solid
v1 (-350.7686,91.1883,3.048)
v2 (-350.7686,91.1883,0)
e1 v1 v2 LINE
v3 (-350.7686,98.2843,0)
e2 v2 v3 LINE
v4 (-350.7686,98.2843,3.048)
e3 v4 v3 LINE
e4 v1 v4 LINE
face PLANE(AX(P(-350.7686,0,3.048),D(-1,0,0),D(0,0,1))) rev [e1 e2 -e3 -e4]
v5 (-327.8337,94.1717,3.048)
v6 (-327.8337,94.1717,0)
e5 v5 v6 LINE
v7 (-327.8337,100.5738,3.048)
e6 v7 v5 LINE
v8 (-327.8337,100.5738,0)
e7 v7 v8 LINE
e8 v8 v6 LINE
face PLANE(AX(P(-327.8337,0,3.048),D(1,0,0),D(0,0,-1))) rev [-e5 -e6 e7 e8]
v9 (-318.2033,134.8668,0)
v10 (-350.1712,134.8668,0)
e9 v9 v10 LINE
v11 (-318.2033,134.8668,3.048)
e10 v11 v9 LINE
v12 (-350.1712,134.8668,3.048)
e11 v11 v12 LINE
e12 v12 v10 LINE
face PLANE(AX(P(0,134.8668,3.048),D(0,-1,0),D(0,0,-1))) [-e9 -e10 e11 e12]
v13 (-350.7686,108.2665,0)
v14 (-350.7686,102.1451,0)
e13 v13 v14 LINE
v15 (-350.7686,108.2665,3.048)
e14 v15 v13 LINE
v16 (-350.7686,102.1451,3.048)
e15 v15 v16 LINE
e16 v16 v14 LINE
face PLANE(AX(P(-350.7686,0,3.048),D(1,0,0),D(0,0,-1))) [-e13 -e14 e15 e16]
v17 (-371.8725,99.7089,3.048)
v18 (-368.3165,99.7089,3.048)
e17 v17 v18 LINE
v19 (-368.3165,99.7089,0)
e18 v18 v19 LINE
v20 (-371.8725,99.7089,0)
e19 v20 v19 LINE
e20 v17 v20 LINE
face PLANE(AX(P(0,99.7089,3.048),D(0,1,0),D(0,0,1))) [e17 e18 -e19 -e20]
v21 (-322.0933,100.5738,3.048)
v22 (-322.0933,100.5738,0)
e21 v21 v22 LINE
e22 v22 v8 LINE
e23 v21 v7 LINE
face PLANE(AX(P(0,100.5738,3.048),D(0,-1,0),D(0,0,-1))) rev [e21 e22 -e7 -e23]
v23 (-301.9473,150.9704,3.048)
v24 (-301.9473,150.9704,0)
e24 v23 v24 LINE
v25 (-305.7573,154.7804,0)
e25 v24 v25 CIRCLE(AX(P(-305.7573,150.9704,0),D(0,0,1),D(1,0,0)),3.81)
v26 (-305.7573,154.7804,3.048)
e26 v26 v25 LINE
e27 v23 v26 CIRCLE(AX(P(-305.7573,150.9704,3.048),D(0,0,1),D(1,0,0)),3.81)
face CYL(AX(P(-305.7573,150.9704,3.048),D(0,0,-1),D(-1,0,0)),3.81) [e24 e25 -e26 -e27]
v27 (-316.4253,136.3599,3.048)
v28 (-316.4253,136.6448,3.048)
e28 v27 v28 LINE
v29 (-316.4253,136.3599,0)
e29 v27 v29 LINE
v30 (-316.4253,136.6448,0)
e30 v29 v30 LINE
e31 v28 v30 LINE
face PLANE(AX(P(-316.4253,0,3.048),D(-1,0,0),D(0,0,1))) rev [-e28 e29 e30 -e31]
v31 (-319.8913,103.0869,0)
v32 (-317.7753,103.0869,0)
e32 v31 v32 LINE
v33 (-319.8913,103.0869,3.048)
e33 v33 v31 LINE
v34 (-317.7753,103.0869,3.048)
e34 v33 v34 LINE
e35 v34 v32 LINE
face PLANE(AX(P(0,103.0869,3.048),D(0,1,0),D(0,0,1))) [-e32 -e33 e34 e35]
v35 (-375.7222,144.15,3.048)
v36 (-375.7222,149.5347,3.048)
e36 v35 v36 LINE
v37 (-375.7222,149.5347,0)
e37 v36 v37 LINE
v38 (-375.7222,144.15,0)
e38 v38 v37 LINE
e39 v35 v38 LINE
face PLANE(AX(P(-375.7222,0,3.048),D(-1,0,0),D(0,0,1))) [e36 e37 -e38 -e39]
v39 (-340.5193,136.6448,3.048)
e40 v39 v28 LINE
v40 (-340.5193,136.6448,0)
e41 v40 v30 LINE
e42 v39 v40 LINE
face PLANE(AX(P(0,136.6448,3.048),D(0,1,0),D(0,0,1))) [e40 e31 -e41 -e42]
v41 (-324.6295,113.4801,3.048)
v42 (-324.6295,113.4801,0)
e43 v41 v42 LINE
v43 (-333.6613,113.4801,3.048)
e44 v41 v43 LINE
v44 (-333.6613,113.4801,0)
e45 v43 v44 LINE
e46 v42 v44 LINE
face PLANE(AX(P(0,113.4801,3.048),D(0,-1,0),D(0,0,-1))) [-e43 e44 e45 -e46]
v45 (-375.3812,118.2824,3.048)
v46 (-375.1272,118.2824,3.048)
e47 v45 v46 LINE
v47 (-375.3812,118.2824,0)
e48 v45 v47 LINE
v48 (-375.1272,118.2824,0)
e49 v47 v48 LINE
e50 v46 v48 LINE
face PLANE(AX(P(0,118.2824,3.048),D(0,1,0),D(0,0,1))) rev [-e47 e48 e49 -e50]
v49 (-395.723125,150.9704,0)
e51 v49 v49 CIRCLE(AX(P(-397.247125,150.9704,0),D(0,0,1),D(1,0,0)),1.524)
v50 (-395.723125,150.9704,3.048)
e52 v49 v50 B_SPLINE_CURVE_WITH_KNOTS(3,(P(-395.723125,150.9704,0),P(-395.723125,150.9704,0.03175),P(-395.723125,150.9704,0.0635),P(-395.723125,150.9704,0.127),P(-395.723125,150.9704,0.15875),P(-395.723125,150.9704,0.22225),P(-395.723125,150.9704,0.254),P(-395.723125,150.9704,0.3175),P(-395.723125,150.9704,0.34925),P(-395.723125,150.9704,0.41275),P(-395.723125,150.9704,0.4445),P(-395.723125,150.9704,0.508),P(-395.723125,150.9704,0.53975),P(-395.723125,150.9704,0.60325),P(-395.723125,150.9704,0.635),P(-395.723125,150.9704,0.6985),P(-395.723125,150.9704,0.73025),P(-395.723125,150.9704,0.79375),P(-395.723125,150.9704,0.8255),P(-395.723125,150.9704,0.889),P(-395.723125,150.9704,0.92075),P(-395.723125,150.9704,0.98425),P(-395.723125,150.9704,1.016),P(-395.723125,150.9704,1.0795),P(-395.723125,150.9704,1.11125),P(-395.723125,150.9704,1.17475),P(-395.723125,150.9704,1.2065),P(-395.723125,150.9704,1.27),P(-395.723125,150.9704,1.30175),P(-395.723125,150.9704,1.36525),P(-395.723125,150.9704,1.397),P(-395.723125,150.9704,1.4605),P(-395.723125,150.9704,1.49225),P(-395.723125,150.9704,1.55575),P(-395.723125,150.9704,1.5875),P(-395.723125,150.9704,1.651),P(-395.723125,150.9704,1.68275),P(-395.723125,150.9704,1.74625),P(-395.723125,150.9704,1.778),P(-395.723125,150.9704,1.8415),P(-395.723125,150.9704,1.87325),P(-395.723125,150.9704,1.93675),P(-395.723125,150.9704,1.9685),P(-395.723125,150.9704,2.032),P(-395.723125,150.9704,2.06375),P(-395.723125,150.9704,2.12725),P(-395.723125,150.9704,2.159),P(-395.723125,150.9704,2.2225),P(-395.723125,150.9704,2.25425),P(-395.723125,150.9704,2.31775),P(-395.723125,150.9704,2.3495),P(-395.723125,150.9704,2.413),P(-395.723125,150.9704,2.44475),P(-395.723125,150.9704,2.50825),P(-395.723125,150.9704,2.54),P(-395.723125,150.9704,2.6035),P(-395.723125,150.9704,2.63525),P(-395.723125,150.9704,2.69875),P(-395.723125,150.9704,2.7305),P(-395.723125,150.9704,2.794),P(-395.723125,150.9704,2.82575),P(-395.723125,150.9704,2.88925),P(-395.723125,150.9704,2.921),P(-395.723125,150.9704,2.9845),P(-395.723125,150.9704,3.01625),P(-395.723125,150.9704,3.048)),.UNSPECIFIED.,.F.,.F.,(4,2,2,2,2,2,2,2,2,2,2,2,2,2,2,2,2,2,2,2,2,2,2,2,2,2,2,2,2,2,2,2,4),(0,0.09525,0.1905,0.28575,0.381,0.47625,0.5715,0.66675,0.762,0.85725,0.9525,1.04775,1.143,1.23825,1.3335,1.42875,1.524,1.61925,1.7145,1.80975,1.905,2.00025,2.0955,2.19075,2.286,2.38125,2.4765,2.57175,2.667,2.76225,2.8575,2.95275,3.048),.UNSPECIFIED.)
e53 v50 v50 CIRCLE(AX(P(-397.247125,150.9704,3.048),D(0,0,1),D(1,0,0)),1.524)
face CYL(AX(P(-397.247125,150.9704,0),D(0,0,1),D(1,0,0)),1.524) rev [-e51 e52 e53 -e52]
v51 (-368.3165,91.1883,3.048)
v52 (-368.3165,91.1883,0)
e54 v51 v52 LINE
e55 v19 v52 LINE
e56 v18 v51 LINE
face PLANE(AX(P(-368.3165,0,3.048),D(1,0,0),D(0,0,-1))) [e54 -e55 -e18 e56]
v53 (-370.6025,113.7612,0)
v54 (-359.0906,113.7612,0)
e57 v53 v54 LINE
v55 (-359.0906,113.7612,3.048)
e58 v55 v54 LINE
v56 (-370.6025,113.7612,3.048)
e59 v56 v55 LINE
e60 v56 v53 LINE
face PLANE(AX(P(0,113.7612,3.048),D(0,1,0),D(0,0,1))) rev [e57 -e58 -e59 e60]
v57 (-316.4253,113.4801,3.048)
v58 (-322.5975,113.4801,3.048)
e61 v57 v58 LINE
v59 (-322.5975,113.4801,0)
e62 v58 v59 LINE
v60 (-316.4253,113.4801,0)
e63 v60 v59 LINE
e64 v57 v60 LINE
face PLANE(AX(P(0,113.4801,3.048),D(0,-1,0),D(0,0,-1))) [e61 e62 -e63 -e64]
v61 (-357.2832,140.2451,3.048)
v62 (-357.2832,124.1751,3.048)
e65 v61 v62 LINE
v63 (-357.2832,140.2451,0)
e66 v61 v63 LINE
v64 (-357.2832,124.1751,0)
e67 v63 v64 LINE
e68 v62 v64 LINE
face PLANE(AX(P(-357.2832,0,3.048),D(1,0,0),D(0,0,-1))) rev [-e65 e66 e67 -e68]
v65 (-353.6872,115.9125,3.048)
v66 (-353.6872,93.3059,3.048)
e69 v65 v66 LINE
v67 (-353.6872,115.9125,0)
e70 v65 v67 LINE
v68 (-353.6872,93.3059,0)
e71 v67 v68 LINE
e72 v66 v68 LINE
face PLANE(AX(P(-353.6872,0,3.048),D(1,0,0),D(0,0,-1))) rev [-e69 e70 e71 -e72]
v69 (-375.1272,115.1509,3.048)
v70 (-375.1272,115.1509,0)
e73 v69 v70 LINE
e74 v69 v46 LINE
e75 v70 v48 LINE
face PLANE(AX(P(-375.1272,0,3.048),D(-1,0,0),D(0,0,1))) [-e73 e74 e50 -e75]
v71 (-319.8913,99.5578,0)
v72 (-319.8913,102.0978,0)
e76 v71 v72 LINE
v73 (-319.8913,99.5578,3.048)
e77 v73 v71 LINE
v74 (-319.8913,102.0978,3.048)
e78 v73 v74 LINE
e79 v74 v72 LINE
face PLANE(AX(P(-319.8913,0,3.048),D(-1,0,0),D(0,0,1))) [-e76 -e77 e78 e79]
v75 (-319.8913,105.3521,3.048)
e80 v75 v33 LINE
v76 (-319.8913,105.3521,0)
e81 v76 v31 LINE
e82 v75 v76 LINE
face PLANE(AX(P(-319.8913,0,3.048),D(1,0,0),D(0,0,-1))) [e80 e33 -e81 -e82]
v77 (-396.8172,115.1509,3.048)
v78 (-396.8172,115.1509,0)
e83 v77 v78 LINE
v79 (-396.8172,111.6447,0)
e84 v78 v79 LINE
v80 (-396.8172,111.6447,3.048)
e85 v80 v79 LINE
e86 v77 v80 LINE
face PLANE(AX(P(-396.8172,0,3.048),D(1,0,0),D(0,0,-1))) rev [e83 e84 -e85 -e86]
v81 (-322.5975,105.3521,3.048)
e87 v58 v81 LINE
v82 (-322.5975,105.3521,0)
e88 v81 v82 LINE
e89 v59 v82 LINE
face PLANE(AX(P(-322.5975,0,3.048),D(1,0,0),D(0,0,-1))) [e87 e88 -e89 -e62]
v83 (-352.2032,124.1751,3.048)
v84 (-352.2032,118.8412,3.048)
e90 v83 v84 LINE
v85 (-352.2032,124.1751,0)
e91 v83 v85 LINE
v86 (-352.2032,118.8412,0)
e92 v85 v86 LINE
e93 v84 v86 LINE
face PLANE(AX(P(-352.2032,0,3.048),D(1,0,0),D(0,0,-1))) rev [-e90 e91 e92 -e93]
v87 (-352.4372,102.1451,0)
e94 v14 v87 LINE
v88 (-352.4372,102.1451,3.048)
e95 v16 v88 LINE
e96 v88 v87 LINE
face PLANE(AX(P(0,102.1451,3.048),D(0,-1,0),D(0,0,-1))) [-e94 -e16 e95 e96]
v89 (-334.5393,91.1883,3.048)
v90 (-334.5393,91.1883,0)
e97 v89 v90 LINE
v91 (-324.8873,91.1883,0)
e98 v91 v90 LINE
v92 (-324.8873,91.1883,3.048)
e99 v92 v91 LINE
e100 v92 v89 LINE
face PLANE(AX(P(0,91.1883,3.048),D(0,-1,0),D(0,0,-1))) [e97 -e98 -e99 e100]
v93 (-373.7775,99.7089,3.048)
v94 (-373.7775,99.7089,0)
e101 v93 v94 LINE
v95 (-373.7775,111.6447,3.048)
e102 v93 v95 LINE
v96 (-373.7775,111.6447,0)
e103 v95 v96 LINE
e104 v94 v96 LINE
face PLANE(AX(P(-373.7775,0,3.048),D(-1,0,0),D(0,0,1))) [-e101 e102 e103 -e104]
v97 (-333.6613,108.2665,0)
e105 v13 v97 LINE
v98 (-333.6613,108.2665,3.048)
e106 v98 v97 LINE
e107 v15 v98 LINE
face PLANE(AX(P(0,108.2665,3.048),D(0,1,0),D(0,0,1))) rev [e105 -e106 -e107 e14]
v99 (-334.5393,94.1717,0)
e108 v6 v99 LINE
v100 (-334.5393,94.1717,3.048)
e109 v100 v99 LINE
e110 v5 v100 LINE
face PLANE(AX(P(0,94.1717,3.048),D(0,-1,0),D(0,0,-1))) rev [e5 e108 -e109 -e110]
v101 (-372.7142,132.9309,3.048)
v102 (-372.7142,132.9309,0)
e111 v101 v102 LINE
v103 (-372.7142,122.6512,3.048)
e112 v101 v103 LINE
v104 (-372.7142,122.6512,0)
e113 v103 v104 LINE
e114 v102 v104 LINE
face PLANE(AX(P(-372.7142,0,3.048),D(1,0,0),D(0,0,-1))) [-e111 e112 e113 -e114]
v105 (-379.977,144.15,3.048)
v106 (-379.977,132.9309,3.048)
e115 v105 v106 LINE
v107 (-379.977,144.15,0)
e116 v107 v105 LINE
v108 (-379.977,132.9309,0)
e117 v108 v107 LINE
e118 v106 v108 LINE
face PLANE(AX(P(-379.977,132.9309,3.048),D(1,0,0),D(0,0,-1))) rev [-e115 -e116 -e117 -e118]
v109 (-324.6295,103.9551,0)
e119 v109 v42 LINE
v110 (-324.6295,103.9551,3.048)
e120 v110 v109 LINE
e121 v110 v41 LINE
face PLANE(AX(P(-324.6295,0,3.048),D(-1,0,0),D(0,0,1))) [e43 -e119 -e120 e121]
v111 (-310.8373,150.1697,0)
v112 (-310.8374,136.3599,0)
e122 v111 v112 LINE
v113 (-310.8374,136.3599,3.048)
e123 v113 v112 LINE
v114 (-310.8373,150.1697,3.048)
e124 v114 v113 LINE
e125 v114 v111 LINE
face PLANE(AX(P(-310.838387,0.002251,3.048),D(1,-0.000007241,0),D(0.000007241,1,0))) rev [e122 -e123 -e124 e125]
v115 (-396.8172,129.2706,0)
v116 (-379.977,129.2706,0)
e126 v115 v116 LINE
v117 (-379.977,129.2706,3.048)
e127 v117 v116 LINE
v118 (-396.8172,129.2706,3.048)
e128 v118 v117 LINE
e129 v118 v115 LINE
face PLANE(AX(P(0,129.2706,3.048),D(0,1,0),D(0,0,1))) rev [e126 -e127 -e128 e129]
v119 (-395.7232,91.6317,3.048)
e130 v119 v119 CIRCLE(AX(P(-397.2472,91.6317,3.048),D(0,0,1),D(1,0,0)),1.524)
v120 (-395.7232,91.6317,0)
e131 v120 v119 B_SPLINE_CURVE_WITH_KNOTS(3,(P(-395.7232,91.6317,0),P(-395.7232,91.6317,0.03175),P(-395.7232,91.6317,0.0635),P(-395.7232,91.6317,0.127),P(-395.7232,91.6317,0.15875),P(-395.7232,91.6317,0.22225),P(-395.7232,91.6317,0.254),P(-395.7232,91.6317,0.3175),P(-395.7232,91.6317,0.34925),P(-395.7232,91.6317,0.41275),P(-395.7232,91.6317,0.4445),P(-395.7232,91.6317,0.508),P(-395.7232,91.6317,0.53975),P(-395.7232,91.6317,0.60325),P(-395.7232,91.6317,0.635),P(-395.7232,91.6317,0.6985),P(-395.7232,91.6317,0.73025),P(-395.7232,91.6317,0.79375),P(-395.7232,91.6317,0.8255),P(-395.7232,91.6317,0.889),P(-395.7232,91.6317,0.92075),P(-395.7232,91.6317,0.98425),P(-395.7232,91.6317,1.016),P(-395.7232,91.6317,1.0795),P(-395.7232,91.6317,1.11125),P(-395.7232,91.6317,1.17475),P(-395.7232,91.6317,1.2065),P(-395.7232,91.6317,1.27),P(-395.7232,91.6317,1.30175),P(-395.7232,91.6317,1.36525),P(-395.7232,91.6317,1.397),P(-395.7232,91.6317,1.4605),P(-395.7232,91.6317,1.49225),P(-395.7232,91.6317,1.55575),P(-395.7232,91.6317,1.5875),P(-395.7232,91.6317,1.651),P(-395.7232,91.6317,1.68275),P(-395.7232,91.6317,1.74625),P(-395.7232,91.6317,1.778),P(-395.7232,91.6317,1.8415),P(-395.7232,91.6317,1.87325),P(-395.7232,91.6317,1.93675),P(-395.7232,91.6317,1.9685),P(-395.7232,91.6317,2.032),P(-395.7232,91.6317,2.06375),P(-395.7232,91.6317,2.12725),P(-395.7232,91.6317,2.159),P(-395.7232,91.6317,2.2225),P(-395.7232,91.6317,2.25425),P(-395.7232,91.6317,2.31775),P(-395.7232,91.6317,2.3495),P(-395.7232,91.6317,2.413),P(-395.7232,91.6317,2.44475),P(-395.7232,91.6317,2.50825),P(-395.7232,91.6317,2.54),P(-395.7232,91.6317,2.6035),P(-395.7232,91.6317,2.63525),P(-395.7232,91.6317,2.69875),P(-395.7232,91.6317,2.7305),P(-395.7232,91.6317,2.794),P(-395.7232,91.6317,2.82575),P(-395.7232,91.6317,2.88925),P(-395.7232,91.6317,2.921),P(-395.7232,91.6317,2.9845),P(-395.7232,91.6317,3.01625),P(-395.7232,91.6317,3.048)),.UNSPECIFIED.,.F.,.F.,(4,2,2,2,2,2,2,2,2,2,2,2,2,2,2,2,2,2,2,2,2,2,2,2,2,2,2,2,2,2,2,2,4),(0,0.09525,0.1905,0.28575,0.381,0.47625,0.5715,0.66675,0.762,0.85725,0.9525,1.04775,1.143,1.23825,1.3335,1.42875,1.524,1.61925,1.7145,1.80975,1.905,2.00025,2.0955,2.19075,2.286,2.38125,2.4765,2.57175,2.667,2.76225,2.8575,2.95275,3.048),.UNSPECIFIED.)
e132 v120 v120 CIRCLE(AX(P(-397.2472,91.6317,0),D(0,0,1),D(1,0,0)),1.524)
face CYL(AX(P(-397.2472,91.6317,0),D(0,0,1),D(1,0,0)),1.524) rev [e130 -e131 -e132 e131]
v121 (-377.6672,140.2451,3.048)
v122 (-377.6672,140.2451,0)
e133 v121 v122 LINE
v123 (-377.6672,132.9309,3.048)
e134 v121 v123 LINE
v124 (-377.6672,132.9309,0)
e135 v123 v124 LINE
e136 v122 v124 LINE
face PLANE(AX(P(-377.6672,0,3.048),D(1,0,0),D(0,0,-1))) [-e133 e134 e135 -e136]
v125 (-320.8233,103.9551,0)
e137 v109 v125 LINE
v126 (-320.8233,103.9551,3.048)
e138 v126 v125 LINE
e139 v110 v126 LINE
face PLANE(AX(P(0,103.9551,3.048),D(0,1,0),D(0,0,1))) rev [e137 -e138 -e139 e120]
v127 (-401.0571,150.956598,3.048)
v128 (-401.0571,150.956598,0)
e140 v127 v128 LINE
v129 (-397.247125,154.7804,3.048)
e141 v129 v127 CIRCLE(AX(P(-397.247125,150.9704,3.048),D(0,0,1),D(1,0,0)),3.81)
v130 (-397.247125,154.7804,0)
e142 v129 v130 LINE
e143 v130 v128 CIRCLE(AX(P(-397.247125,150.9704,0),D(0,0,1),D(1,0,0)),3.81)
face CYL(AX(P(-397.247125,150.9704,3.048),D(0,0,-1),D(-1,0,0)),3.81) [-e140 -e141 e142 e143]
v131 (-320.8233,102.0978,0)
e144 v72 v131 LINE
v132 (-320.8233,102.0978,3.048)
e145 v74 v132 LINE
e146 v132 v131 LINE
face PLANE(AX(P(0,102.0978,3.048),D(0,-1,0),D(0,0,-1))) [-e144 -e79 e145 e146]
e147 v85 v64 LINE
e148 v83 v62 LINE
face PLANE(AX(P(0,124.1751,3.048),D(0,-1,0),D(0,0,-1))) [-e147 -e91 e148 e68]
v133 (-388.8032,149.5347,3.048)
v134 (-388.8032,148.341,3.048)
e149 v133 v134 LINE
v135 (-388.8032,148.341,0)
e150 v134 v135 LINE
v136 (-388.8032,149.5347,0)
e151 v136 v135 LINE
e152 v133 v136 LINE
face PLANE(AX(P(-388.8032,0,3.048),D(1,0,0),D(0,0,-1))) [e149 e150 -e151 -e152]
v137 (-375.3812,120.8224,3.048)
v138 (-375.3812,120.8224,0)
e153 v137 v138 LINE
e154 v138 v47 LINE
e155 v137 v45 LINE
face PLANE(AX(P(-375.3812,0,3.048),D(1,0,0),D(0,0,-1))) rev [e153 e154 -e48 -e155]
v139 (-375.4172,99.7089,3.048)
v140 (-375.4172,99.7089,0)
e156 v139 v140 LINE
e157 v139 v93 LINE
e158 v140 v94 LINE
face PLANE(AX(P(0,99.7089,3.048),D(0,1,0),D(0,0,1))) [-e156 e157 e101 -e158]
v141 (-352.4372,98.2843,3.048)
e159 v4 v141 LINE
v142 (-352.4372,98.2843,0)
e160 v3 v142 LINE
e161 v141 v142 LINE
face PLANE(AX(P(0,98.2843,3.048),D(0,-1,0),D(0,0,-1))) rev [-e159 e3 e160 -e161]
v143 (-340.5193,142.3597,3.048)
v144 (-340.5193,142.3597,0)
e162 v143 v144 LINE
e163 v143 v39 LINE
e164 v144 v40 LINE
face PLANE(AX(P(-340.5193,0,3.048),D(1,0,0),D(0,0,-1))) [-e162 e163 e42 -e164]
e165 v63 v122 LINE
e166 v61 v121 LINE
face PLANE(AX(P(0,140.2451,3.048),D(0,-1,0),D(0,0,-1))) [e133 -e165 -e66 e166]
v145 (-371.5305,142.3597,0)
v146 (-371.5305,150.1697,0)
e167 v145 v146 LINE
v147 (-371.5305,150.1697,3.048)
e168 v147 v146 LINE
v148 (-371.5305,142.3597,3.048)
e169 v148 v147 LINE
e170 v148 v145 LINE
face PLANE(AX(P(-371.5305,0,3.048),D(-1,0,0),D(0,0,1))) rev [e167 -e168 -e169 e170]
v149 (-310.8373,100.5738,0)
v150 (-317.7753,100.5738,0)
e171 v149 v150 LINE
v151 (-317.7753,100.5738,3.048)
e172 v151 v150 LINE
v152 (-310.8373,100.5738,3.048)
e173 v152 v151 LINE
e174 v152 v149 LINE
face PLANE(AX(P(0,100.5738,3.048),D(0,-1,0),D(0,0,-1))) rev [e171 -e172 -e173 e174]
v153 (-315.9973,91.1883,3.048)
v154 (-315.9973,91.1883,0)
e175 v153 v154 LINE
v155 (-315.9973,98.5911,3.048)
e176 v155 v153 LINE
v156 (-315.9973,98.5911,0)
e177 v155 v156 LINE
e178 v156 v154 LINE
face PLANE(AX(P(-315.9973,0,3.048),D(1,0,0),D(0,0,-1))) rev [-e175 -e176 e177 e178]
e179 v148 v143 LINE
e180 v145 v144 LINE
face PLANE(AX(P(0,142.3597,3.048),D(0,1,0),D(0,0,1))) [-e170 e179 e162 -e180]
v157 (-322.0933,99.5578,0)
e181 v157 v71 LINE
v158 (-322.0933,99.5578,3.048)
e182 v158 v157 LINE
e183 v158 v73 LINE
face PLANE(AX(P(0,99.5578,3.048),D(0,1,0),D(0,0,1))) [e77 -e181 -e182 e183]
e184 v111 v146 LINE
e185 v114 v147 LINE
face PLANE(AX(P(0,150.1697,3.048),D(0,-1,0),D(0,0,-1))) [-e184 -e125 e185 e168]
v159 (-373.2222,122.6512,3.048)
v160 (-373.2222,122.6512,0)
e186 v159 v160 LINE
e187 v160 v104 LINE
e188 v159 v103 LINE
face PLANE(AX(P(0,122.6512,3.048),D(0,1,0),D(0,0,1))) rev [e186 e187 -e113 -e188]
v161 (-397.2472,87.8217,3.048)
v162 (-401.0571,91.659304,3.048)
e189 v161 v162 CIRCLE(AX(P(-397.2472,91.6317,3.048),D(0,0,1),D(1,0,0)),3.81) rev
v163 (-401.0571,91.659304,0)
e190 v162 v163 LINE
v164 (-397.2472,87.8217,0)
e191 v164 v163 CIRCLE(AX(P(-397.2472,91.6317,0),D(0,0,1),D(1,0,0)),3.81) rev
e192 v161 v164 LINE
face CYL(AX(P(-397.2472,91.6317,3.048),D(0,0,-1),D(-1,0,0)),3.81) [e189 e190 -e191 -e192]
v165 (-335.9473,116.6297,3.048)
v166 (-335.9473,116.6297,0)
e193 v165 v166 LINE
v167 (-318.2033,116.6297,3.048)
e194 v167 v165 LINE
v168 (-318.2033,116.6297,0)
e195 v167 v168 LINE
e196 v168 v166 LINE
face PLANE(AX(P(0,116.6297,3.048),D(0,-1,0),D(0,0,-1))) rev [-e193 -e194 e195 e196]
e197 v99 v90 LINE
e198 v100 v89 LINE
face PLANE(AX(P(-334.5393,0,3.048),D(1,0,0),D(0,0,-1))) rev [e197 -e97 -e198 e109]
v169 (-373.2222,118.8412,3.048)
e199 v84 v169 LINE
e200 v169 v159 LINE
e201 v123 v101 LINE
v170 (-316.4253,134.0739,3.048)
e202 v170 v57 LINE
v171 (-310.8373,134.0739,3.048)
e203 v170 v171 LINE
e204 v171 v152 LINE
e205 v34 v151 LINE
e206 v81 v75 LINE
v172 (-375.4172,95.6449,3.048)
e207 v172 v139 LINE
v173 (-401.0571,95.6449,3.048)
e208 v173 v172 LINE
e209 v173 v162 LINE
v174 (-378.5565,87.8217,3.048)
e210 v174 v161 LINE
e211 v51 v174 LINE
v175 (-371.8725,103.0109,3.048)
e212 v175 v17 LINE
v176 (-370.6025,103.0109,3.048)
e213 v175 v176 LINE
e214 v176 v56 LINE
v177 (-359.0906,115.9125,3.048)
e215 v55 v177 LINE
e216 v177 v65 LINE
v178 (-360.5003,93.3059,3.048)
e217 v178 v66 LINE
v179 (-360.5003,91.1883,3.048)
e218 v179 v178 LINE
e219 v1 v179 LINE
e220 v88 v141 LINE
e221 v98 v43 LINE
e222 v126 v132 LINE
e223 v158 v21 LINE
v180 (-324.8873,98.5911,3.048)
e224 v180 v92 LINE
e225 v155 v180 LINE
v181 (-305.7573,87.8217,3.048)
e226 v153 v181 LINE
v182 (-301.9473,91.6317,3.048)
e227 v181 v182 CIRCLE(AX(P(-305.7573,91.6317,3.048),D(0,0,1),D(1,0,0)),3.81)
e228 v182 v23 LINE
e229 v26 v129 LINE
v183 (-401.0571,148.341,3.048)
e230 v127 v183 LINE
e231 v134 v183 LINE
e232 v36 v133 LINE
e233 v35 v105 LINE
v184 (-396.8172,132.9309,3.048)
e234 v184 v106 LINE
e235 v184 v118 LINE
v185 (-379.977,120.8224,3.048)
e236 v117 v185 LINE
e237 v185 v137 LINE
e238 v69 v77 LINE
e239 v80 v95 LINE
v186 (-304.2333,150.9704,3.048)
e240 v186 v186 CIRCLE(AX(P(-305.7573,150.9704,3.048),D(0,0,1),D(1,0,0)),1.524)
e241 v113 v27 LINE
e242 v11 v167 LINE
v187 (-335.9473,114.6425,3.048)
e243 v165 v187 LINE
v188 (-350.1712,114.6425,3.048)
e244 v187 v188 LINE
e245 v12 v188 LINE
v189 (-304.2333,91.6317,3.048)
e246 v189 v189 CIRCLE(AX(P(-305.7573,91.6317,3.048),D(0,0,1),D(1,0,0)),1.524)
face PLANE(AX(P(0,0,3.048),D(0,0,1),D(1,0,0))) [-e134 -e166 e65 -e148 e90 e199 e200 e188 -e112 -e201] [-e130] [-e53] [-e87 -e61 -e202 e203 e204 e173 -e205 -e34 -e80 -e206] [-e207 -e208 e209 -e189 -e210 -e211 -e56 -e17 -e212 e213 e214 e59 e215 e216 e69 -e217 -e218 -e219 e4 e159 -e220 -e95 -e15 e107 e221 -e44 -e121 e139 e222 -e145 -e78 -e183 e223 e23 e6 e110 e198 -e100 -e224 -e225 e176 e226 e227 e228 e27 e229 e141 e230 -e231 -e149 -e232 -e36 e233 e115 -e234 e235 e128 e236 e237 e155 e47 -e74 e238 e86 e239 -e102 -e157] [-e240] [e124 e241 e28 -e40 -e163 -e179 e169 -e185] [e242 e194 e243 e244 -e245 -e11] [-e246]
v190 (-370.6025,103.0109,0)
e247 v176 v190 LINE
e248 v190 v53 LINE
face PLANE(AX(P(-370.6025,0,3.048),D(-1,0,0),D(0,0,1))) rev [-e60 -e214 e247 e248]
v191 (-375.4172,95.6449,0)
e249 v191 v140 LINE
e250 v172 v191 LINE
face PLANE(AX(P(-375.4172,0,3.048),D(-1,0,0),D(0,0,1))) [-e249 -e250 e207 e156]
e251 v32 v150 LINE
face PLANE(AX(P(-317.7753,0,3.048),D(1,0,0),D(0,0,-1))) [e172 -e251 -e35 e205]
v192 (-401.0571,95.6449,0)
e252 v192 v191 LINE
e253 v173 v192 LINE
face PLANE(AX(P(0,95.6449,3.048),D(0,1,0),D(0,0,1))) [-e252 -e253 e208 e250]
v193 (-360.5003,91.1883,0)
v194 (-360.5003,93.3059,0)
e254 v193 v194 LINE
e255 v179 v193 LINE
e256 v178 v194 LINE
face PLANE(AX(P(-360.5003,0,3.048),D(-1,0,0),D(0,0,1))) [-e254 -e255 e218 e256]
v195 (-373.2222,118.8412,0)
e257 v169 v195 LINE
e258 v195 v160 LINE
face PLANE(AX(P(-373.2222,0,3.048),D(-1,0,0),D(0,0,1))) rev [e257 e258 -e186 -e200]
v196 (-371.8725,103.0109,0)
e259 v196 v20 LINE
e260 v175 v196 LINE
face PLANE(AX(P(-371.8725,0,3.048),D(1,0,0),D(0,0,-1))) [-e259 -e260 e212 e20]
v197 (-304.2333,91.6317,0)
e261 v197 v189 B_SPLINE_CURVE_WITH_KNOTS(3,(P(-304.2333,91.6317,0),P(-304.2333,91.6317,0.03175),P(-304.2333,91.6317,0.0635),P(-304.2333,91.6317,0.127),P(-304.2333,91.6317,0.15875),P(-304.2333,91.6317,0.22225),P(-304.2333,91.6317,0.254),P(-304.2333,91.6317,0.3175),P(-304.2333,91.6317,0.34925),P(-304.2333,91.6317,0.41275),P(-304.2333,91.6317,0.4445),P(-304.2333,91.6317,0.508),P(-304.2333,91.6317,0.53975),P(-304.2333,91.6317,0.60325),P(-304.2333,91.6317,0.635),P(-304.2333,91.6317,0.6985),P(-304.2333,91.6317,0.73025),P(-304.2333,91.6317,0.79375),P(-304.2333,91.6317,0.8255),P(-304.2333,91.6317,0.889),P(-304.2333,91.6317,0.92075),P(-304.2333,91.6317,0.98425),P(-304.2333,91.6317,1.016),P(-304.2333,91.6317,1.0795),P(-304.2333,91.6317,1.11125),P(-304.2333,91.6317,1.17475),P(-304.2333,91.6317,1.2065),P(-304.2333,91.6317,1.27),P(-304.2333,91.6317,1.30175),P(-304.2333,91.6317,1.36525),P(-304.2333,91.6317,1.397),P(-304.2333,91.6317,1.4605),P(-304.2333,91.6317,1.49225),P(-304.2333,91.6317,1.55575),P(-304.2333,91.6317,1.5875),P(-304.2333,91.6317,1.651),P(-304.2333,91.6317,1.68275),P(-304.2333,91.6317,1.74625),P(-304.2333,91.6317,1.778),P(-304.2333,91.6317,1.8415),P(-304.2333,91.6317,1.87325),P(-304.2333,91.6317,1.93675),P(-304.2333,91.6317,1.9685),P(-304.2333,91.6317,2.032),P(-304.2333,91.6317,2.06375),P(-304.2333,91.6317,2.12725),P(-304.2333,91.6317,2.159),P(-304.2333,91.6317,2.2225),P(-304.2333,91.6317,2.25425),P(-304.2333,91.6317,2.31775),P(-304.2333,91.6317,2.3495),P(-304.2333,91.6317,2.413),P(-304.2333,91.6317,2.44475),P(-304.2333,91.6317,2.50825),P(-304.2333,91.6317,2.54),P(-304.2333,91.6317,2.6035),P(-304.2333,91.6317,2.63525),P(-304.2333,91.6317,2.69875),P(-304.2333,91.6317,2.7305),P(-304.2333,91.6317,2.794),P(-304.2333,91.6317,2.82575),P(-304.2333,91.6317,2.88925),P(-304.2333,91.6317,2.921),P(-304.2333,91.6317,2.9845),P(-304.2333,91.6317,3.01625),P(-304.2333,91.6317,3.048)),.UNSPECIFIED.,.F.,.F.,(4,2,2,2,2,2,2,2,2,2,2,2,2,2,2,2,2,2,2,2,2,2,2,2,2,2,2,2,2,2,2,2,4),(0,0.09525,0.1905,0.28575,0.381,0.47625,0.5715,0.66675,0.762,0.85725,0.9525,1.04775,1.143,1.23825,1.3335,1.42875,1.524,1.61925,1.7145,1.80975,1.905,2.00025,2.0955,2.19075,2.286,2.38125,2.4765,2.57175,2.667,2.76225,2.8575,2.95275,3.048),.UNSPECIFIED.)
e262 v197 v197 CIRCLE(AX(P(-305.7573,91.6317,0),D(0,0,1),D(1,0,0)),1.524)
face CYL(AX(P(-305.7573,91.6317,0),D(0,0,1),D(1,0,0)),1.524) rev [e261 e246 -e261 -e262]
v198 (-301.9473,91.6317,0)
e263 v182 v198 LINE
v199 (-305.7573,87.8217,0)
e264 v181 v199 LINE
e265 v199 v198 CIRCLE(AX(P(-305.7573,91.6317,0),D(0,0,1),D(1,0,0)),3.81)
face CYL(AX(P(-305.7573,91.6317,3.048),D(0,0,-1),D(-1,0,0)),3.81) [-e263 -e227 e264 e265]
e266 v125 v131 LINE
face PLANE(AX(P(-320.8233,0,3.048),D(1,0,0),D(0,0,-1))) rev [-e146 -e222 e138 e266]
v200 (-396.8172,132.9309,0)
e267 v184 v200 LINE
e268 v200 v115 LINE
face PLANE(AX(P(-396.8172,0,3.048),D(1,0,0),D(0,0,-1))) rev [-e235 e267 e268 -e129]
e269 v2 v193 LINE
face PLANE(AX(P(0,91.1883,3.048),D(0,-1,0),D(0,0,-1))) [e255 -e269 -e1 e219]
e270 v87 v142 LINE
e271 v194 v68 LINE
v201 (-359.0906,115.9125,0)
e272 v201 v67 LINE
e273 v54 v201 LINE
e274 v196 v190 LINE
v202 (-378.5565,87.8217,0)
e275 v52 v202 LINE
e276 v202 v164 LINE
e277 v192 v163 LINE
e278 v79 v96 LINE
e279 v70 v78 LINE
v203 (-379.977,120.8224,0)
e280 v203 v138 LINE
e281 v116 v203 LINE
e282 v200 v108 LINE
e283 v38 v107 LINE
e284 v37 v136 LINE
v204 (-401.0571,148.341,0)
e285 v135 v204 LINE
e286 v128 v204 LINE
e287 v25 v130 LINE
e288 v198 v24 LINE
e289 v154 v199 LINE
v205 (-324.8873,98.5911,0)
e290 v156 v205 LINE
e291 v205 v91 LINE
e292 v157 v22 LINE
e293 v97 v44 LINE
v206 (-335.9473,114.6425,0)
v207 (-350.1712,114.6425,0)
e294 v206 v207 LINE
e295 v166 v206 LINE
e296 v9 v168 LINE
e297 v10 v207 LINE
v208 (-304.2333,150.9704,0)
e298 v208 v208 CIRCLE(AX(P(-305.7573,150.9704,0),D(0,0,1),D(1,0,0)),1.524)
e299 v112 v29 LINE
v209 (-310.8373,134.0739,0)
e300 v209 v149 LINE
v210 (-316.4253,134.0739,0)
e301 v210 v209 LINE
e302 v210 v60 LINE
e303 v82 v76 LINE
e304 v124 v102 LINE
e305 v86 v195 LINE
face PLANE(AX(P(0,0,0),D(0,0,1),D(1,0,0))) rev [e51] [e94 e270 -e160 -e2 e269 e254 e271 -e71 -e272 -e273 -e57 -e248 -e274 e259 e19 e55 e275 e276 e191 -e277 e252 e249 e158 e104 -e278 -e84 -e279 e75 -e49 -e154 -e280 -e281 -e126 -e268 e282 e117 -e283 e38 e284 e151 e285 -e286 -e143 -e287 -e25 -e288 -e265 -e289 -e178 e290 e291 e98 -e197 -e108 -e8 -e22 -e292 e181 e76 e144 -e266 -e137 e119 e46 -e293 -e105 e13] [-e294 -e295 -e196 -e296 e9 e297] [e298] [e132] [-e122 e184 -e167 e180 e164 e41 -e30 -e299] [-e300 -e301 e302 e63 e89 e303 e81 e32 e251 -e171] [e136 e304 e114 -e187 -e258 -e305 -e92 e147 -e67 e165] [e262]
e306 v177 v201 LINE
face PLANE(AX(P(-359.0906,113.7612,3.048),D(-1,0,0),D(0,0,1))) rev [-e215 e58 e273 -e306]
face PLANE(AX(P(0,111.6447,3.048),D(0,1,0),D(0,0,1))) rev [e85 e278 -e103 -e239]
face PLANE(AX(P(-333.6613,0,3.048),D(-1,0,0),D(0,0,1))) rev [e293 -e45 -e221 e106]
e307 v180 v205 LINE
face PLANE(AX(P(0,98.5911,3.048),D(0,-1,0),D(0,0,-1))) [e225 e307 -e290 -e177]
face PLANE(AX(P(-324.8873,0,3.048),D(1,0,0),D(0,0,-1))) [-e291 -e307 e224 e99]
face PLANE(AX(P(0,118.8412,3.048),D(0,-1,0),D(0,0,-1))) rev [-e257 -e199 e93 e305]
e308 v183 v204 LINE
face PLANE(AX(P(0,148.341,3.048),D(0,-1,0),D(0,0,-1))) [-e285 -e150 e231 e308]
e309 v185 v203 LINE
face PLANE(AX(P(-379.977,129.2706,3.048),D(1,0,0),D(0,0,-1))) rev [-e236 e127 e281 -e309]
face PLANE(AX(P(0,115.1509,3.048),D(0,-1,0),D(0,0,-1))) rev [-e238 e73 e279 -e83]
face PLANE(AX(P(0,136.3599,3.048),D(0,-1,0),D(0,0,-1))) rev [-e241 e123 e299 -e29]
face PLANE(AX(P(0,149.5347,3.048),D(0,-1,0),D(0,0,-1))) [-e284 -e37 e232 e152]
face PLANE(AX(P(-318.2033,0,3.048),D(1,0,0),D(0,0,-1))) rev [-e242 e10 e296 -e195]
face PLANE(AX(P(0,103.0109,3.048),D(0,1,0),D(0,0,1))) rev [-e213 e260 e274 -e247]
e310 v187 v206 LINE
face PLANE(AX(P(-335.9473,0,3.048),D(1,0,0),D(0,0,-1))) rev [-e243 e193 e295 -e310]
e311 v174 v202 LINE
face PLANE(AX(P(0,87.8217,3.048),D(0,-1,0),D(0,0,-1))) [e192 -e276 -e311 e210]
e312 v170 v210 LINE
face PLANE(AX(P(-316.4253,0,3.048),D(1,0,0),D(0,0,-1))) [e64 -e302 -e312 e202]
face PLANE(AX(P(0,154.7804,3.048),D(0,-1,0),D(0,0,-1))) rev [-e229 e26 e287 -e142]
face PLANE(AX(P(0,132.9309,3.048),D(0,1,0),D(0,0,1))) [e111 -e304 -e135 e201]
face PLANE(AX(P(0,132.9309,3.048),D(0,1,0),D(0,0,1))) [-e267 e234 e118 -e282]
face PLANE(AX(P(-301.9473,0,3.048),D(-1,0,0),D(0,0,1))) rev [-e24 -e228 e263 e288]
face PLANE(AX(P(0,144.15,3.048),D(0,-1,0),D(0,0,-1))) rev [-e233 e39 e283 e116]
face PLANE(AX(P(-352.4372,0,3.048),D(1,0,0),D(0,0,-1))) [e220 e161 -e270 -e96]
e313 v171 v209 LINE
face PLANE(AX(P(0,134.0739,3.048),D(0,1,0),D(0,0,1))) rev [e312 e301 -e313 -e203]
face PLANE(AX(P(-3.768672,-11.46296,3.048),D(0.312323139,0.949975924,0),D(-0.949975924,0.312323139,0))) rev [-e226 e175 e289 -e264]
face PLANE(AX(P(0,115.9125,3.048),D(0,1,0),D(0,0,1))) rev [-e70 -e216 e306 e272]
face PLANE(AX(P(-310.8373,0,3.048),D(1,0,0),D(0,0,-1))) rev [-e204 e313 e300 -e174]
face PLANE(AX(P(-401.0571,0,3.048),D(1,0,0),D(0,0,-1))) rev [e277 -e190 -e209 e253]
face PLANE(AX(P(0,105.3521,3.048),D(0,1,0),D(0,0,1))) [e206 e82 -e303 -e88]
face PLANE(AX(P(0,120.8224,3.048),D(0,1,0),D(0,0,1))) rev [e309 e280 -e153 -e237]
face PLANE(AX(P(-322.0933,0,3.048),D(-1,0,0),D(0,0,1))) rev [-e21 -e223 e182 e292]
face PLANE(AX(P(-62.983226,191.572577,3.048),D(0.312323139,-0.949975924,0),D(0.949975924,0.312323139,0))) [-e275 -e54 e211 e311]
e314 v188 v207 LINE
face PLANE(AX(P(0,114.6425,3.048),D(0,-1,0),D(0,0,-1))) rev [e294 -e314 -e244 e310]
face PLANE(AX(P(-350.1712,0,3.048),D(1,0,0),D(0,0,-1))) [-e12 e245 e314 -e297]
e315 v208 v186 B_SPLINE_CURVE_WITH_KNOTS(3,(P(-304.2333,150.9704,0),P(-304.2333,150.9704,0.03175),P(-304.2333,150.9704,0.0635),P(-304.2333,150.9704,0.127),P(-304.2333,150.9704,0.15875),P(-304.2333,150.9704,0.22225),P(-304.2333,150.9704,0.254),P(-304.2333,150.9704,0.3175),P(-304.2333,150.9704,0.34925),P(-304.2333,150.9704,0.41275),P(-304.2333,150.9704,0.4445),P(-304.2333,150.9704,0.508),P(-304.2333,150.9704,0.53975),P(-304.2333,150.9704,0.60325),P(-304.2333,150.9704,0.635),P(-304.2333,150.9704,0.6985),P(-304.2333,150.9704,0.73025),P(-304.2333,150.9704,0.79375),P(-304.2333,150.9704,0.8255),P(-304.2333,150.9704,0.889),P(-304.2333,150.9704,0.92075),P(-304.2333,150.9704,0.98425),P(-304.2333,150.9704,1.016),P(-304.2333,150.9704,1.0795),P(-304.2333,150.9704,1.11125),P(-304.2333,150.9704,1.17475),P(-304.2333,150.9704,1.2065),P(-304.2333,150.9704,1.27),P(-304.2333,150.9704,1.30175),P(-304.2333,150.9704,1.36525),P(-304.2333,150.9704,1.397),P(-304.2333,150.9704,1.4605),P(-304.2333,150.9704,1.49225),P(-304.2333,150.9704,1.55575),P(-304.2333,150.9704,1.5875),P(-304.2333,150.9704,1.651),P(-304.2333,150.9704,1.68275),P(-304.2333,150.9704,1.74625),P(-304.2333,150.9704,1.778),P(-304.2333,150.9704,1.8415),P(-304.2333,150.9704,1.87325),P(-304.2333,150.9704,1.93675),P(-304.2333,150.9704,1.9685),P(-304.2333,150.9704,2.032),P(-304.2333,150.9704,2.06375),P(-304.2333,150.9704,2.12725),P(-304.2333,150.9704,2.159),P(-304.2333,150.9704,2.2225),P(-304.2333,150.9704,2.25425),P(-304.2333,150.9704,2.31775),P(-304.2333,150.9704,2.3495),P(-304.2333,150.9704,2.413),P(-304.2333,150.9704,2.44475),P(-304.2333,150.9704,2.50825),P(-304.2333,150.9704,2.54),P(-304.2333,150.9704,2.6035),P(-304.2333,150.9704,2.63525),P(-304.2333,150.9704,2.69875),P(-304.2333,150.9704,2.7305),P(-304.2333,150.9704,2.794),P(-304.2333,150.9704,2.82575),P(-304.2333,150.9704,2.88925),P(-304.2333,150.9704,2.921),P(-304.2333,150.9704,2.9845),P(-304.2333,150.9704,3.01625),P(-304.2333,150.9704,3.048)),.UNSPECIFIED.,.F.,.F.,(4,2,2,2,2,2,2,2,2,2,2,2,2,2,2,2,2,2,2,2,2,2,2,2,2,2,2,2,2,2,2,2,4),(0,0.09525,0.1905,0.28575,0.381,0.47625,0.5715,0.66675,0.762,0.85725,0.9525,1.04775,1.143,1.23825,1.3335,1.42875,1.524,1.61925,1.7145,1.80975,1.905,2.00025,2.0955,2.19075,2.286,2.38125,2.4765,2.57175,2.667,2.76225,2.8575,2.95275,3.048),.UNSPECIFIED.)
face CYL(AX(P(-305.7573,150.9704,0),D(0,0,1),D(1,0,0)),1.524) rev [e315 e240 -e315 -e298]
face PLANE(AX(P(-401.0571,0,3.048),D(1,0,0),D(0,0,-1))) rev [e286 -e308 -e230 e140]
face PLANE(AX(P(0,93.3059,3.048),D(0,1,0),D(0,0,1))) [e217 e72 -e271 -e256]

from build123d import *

# Parameters (mm, degrees)
BOSS_EXTRUDE1_OUTLINE_R = 1.3462
BOSS_EXTRUDE1_DEPTH     = 3.048
SKETCH14_W              = 2.2754
SKETCH14_H              = 2.1513
CUT_EXTRUDE2_DEPTH      = 430.898988368
SKETCH15_W              = 16.8402
SKETCH15_H              = 14.1197
SKETCH15_H_2            = 15.4101
CUT_EXTRUDE3_DEPTH      = 430.898988368
SKETCH16_R              = 1.524
CUT_EXTRUDE4_DEPTH      = 430.898988368


# Read off the part's stored shape, not the designer's step: Boss-Extrude1
with BuildPart() as part:
    # Boss-Extrude1 outline → Boss-Extrude1 (new body)
    with BuildSketch(Plane.XY):
        with BuildLine():
            ThreePointArc((-397.247125, 154.7804), (-399.946077222, 153.659592612), (-401.0571, 150.956597849))
            Line((-401.0571, 150.956597849), (-401.0571, 148.341))
            Line((-401.0571, 148.341), (-388.8032, 148.341))
            Line((-388.8032, 148.341), (-388.8032, 149.5347))
            Line((-388.8032, 149.5347), (-375.7222, 149.5347))
            Line((-375.7222, 149.5347), (-375.7222, 144.15))
            Line((-375.7222, 144.15), (-380.1672, 144.15))
            Line((-380.1672, 144.15), (-380.1672, 132.9309))
            Line((-380.1672, 132.9309), (-396.8172, 132.9309))
            Line((-396.8172, 132.9309), (-396.8172, 129.2706))
            Line((-396.8172, 129.2706), (-380.1672, 129.2706))
            Line((-380.1672, 129.2706), (-380.1672, 120.8224))
            Line((-380.1672, 120.8224), (-375.3812, 120.8224))
            Line((-375.3812, 120.8224), (-375.3812, 118.2824))
            Line((-375.3812, 118.2824), (-375.1272, 118.2824))
            Line((-375.1272, 118.2824), (-375.1272, 115.1509))
            Line((-375.1272, 115.1509), (-396.8172, 115.1509))
            Line((-396.8172, 115.1509), (-396.8172, 111.6447))
            Line((-396.8172, 111.6447), (-373.7775, 111.6447))
            Line((-373.7775, 111.6447), (-373.7775, 99.7089))
            Line((-373.7775, 99.7089), (-375.4172, 99.7089))
            Line((-375.4172, 99.7089), (-375.4172, 95.6449))
            Line((-375.4172, 95.6449), (-401.0571, 95.6449))
            Line((-401.0571, 95.6449), (-401.0571, 91.659304166))
            ThreePointArc((-401.0571, 91.659304166), (-399.951018769, 88.947400452), (-397.2472, 87.8217))
            Line((-397.2472, 87.8217), (-378.5565, 87.8217))
            Line((-378.5565, 87.8217), (-368.3165, 91.1883))
            Line((-368.3165, 91.1883), (-368.3165, 99.7089))
            Line((-368.3165, 99.7089), (-371.8725, 99.7089))
            Line((-371.8725, 99.7089), (-371.8725, 103.0109))
            Line((-371.8725, 103.0109), (-370.6025, 103.0109))
            Line((-370.6025, 103.0109), (-370.6025, 113.7612))
            Line((-370.6025, 113.7612), (-356.8152, 113.7612))
            Line((-356.8152, 113.7612), (-356.8152, 115.9125))
            Line((-356.8152, 115.9125), (-353.6872, 115.9125))
            Line((-353.6872, 115.9125), (-353.6872, 93.3059))
            Line((-353.6872, 93.3059), (-360.5003, 93.3059))
            Line((-360.5003, 93.3059), (-360.5003, 91.1883))
            Line((-360.5003, 91.1883), (-350.7686, 91.1883))
            Line((-350.7686, 91.1883), (-350.7686, 98.2843))
            Line((-350.7686, 98.2843), (-352.4372, 98.2843))
            Line((-352.4372, 98.2843), (-352.4372, 102.1451))
            Line((-352.4372, 102.1451), (-350.7686, 102.1451))
            Line((-350.7686, 102.1451), (-350.7686, 108.2665))
            Line((-350.7686, 108.2665), (-333.6613, 108.2665))
            Line((-333.6613, 108.2665), (-333.6613, 113.4801))
            Line((-333.6613, 113.4801), (-324.6295, 113.4801))
            Line((-324.6295, 113.4801), (-324.6295, 103.9551))
            Line((-324.6295, 103.9551), (-320.8233, 103.9551))
            Line((-320.8233, 103.9551), (-320.8233, 102.0978))
            Line((-320.8233, 102.0978), (-319.8913, 102.0978))
            Line((-319.8913, 102.0978), (-319.8913, 99.5578))
            Line((-319.8913, 99.5578), (-322.0933, 99.5578))
            Line((-322.0933, 99.5578), (-322.0933, 100.5738))
            Line((-322.0933, 100.5738), (-327.8337, 100.5738))
            Line((-327.8337, 100.5738), (-327.8337, 94.1717))
            Line((-327.8337, 94.1717), (-334.5393, 94.1717))
            Line((-334.5393, 94.1717), (-334.5393, 91.1883))
            Line((-334.5393, 91.1883), (-324.8873, 91.1883))
            Line((-324.8873, 91.1883), (-324.8873, 98.5911))
            Line((-324.8873, 98.5911), (-315.9973, 98.5911))
            Line((-315.9973, 98.5911), (-315.9973, 91.1883))
            Line((-315.9973, 91.1883), (-305.7573, 87.8217))
            ThreePointArc((-305.7573, 87.8217), (-303.063223164, 88.937623164), (-301.9473, 91.6317))
            Line((-301.9473, 91.6317), (-301.9473, 150.9704))
            ThreePointArc((-301.9473, 150.9704), (-303.063223164, 153.664476836), (-305.7573, 154.7804))
            Line((-305.7573, 154.7804), (-397.247125, 154.7804))
        make_face()
        with Locations((-397.2472, 91.6317)):
            Circle(BOSS_EXTRUDE1_OUTLINE_R, mode=Mode.SUBTRACT)
        with Locations((-305.7573, 91.6317)):
            Circle(BOSS_EXTRUDE1_OUTLINE_R, mode=Mode.SUBTRACT)
        Polygon((-322.5975, 105.3521), (-322.5975, 113.4801), (-316.4253, 113.4801), (-316.4253, 134.0739), (-310.8373, 134.0739), (-310.8373, 100.5738), (-317.7753, 100.5738), (-317.7753, 103.0869), (-319.8913, 103.0869), (-319.8913, 105.3521), align=None, mode=Mode.SUBTRACT)
        Polygon((-372.7142, 122.6512), (-372.7142, 132.9309), (-377.6672, 132.9309), (-377.6672, 140.2451), (-357.2832, 140.2451), (-357.2832, 124.1751), (-352.2032, 124.1751), (-352.2032, 118.8412), (-373.2222, 118.8412), (-373.2222, 122.6512), align=None, mode=Mode.SUBTRACT)
        with Locations((-397.247125, 150.9704)):
            Circle(BOSS_EXTRUDE1_OUTLINE_R, mode=Mode.SUBTRACT)
        Polygon((-335.9473, 116.6297), (-335.9473, 114.6425), (-350.1712, 114.6425), (-350.1712, 134.8668), (-318.2033, 134.8668), (-318.2033, 116.6297), align=None, mode=Mode.SUBTRACT)
        Polygon((-310.8374, 136.3599), (-316.4253, 136.3599), (-316.4253, 136.6448), (-340.5193, 136.6448), (-340.5193, 142.3597), (-371.5305, 142.3597), (-371.5305, 150.1697), (-310.8373, 150.1697), align=None, mode=Mode.SUBTRACT)
        with Locations((-305.7573, 150.9704)):
            Circle(BOSS_EXTRUDE1_OUTLINE_R, mode=Mode.SUBTRACT)
    extrude(amount=BOSS_EXTRUDE1_DEPTH)

    # Sketch14 → Cut-Extrude2 (cut, through all)
    with BuildSketch(Plane(origin=(0, 0, 0), x_dir=(-1, 0, 0), z_dir=(0, 0, -1))):
        with Locations((357.9529, 114.83685)):
            Rectangle(SKETCH14_W, SKETCH14_H)
    extrude(amount=-CUT_EXTRUDE2_DEPTH, mode=Mode.SUBTRACT)

    # Sketch15 → Cut-Extrude3 (cut, through all)
    with BuildSketch(Plane(origin=(0, 0, 0), x_dir=(-1, 0, 0), z_dir=(0, 0, -1))):
        with Locations((388.3971, 122.21075)):
            Rectangle(SKETCH15_W, SKETCH15_H)
        with Locations((388.3971, 140.63595)):
            Rectangle(SKETCH15_W, SKETCH15_H_2)
    extrude(amount=-CUT_EXTRUDE3_DEPTH, mode=Mode.SUBTRACT)

    # Sketch16 → Cut-Extrude4 (cut, through all)
    with BuildSketch(Plane.XY.offset(3.048)):
        with Locations((-397.247125, 150.9704)):
            Circle(SKETCH16_R)
        with Locations((-305.7573, 150.9704)):
            Circle(SKETCH16_R)
        with Locations((-305.7573, 91.6317)):
            Circle(SKETCH16_R)
        with Locations((-397.2472, 91.6317)):
            Circle(SKETCH16_R)
    extrude(amount=-CUT_EXTRUDE4_DEPTH, mode=Mode.SUBTRACT)


solid = part.part
